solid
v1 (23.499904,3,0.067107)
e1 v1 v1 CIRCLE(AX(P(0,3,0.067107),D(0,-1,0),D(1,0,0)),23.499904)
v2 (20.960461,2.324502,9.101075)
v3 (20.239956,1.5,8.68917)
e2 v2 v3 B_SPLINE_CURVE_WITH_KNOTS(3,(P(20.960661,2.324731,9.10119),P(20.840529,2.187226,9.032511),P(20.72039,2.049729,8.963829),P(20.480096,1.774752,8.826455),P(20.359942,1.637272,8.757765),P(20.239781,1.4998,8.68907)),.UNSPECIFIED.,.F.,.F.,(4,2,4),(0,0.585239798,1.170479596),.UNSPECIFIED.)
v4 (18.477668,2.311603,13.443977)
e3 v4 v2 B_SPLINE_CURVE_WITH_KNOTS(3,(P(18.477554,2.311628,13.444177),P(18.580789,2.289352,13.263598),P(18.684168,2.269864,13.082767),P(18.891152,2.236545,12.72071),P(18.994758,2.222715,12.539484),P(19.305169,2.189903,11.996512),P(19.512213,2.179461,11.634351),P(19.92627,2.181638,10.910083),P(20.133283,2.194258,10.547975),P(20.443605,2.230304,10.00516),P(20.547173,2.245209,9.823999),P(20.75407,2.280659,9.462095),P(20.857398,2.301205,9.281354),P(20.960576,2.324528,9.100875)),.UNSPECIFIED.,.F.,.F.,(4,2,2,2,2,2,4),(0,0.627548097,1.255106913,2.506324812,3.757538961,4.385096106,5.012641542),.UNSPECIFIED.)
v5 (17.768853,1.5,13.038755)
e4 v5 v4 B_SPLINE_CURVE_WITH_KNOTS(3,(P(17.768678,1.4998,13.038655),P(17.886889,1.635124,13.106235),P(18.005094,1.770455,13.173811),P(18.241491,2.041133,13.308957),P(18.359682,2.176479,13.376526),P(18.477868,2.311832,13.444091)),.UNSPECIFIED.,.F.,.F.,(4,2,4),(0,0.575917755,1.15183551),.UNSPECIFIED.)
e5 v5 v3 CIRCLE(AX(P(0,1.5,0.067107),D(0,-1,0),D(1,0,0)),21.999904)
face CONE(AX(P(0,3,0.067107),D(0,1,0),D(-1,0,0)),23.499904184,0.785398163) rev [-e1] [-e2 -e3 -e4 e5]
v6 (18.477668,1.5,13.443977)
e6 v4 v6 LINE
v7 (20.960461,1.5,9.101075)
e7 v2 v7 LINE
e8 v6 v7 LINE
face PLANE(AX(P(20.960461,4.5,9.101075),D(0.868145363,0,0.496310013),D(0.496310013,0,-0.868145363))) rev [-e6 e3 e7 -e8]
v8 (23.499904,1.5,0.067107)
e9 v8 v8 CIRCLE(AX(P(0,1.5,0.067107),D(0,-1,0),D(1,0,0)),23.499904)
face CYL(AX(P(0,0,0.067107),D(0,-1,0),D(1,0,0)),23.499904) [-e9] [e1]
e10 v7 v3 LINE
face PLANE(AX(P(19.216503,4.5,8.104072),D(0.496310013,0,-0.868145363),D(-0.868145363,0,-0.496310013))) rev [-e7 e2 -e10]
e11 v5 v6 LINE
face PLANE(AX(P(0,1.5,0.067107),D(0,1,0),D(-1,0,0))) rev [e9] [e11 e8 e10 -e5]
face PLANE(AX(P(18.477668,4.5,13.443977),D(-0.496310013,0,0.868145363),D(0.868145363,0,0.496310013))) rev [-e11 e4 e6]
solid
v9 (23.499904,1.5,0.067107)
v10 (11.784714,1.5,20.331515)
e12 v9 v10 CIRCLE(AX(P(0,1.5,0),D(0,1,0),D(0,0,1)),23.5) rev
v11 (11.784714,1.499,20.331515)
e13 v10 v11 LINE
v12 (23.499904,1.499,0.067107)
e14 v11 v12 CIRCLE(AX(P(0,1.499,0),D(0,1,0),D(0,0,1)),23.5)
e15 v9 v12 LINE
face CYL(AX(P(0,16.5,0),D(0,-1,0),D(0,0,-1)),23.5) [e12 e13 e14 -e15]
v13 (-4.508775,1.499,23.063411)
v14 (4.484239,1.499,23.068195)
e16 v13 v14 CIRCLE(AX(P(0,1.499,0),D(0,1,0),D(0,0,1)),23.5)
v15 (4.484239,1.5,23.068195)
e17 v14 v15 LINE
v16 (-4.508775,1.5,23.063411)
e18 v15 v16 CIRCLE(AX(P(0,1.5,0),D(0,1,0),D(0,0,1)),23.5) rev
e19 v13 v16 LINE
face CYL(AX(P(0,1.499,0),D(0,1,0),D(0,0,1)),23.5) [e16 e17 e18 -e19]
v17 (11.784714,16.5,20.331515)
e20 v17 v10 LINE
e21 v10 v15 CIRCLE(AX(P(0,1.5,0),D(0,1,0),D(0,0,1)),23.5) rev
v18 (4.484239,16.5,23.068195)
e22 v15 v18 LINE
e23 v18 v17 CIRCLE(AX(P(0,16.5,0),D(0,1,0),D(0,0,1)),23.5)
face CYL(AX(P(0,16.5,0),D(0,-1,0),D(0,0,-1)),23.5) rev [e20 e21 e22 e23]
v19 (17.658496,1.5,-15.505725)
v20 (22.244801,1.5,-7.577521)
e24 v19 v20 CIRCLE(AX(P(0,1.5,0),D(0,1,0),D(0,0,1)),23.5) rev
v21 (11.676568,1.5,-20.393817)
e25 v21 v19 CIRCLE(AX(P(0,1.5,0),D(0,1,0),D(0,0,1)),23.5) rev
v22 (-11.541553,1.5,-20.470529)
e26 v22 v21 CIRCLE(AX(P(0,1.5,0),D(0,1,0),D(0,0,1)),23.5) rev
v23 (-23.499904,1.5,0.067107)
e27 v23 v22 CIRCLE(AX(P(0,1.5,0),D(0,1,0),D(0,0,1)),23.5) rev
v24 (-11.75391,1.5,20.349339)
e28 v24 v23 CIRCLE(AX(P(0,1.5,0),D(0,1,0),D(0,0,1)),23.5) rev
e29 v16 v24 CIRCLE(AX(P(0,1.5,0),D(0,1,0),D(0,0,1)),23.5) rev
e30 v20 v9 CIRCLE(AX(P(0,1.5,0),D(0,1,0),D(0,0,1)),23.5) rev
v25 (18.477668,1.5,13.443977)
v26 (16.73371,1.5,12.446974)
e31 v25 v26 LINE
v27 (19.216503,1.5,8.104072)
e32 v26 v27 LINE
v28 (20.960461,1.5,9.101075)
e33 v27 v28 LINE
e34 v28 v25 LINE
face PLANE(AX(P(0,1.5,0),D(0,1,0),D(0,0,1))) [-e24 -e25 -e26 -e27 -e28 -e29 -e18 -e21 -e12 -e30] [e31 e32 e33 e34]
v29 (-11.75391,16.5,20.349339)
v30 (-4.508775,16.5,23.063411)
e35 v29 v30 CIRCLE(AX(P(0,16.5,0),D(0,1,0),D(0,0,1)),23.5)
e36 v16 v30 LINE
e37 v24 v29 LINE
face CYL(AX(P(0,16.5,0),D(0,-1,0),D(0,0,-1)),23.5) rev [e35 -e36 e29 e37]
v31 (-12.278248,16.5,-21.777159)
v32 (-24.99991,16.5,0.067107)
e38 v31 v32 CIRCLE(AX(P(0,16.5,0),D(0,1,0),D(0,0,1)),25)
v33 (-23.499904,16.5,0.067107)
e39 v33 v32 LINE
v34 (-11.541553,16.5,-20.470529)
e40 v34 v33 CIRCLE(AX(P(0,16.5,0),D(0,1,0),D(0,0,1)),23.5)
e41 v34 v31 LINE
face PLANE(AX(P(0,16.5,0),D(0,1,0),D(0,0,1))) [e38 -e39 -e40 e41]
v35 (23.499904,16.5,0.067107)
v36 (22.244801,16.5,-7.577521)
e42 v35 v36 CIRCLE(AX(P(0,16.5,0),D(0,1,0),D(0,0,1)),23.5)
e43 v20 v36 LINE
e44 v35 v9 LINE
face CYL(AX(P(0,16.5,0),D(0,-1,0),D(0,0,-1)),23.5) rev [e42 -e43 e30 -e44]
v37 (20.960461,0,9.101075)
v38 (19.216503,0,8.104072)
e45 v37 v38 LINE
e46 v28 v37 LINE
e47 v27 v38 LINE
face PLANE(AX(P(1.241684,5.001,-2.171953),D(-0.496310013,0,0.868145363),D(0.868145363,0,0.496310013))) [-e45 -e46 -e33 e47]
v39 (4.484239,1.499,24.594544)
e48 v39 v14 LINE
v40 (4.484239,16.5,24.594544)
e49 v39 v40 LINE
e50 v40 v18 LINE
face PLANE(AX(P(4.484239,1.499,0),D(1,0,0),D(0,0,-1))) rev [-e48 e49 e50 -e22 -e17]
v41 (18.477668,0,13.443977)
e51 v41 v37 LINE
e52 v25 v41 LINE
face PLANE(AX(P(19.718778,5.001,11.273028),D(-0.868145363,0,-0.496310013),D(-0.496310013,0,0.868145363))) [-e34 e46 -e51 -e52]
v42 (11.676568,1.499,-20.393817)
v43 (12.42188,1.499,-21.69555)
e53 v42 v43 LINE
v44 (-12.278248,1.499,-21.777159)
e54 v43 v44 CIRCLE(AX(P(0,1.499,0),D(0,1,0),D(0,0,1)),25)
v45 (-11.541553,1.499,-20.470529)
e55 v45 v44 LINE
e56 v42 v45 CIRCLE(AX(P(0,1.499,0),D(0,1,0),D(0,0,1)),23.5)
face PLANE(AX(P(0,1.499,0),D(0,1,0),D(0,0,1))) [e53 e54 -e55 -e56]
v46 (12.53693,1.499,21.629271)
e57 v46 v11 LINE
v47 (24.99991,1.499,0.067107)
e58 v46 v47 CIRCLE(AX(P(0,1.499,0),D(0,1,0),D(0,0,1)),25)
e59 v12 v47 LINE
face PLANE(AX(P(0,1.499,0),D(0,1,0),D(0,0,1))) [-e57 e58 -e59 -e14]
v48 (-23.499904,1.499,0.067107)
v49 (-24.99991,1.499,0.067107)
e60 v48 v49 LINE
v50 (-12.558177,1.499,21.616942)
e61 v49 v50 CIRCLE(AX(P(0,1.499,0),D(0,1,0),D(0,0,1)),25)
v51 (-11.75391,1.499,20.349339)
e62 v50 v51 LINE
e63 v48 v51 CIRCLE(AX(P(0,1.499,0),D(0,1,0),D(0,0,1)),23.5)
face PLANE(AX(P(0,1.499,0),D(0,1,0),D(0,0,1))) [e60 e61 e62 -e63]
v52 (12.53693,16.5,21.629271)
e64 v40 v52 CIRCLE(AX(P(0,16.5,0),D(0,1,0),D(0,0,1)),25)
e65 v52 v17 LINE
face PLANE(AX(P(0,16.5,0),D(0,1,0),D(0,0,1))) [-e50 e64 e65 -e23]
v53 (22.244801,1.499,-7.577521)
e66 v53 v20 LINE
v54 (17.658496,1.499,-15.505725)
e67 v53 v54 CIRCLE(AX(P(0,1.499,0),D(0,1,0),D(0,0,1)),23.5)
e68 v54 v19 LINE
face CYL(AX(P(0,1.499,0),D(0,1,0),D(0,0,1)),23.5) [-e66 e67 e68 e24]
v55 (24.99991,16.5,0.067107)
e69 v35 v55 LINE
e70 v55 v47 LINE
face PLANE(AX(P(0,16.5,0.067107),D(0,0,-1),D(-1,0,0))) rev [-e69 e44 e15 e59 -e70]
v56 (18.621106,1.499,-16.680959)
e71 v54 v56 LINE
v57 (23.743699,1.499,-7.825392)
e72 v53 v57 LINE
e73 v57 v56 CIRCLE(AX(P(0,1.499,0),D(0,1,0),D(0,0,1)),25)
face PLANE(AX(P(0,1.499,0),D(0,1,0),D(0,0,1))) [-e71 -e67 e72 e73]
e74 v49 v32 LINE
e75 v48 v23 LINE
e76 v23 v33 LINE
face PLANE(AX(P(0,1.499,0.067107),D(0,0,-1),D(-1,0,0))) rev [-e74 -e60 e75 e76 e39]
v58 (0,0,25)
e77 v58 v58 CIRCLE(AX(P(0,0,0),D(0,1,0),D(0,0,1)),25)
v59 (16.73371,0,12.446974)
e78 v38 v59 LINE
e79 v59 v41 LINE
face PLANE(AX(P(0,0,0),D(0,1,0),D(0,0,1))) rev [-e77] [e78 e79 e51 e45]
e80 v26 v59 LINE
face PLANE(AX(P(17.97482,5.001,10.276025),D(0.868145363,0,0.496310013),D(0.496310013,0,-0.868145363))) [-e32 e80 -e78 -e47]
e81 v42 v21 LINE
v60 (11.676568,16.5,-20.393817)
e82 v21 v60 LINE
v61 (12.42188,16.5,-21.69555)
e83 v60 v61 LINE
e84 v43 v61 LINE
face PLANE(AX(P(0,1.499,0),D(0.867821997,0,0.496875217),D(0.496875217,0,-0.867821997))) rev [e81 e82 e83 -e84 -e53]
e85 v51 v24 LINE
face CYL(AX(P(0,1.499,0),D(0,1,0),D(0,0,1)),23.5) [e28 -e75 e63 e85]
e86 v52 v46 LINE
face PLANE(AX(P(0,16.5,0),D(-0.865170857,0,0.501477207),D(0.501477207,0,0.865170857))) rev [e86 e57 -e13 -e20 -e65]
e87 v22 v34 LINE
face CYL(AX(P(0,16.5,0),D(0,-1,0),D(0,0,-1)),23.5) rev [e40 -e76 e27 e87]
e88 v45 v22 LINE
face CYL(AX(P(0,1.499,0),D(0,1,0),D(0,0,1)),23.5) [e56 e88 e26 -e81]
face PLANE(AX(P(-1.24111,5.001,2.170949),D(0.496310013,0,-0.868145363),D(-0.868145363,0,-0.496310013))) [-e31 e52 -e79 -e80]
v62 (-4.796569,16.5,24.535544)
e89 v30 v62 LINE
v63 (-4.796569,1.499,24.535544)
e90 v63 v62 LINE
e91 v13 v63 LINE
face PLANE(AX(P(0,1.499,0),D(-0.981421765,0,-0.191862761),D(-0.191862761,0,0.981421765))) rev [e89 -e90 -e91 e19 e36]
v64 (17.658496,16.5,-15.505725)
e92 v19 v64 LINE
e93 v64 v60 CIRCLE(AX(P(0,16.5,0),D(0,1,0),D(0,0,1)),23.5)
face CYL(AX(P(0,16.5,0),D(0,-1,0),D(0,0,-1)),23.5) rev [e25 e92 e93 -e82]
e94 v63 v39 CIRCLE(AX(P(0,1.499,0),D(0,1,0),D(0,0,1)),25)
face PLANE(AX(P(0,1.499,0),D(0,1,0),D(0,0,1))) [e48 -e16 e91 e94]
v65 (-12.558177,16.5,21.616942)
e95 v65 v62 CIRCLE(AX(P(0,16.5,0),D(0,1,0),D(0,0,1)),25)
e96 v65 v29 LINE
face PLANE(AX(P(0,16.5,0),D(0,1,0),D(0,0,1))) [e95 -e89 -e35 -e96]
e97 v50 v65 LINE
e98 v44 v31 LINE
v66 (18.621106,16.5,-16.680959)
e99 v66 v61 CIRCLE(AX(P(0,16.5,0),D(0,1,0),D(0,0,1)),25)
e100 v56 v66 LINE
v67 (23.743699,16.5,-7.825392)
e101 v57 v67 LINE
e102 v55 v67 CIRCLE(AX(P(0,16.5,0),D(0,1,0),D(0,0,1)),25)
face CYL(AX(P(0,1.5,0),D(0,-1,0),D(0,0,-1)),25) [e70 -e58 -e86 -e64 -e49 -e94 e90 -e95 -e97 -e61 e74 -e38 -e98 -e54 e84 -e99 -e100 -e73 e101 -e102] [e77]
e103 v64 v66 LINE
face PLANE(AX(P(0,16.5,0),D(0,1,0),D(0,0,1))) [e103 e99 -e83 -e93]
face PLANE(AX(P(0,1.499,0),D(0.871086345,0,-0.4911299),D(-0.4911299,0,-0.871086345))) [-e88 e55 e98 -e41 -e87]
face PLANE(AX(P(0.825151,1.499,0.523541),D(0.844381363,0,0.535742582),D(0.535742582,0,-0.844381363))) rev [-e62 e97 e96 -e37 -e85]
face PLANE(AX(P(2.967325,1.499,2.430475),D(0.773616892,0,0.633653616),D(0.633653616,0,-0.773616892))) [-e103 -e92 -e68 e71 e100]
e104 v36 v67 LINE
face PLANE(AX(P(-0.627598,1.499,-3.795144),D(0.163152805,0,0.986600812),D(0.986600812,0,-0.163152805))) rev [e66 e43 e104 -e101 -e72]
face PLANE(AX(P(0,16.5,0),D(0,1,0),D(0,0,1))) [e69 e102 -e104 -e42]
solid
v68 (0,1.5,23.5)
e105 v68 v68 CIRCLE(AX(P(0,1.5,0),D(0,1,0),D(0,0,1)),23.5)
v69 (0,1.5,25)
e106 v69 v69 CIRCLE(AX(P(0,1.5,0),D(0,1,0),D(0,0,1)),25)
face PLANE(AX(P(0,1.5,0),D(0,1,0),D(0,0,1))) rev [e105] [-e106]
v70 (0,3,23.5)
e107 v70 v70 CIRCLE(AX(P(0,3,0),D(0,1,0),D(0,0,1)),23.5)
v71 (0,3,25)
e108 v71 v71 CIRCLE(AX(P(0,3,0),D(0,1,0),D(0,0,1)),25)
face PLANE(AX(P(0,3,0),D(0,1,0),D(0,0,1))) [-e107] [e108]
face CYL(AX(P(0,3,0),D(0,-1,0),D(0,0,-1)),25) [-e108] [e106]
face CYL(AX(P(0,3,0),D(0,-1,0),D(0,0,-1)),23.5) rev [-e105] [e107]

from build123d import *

# Parameters (mm, degrees)
SKETCH1_R               = 25
BOSS_EXTRUDE1_DEPTH     = 1.5
BOSS_EXTRUDE2_DEPTH     = 15
CUT_EXTRUDE3_DEPTH      = 15
CUT_EXTRUDE3_DEPTH_BACK = 0.001
CUT_EXTRUDE4_DEPTH      = 5.001
SKETCH9_R               = 25
SKETCH9_R_2             = 23.5
BOSS_EXTRUDE4_DEPTH     = 1.5
CUT_EXTRUDE5_DEPTH      = 4.5


with BuildPart() as part:
    # Sketch1 → Boss-Extrude1 (new body)
    with BuildSketch(Plane(origin=(0, 0, 0), x_dir=(1, 0, 0), z_dir=(0, 1, 0))):
        Circle(SKETCH1_R)
    extrude(amount=BOSS_EXTRUDE1_DEPTH)

    # Sketch3 → Boss-Extrude2 (add)
    with BuildSketch(Plane(origin=(0, 1.5, 0), x_dir=(1, 0, 0), z_dir=(0, 1, 0))):
        with BuildLine():
            ThreePointArc((25, 0), (-10.270047641, 22.793115659), (-16.562089716, -18.726910696))
            ThreePointArc((-16.562089716, -18.726910696), (10.270047641, -22.793115659), (25, 0))
        make_face()
        with BuildLine():
            ThreePointArc((23.5, 0), (9.653844782, -21.42552872), (-15.568364333, -17.603296054))
            ThreePointArc((-15.568364333, -17.603296054), (-9.653844782, 21.42552872), (23.5, 0))
        make_face(mode=Mode.SUBTRACT)
    extrude(amount=BOSS_EXTRUDE2_DEPTH)

    # Sketch4 → Cut-Extrude3 (cut, two sides: drawn at the far end of the back side and taken through both)
    with BuildSketch(Plane(origin=(0, 1.5, 0), x_dir=(1, 0, 0), z_dir=(0, 1, 0)).offset(-CUT_EXTRUDE3_DEPTH_BACK)):
        with BuildLine():
            Line((11.784714356, -20.331515132), (12.536930166, -21.629271417))
            ThreePointArc((12.536930166, -21.629271417), (21.64452184, -12.510582494), (24.999909933, -0.067106913))
            Line((24.999909933, -0.067106913), (23.499904184, -0.067106913))
            ThreePointArc((23.499904184, -0.067106913), (20.344842995, -11.761690504), (11.784714356, -20.331515132))
        make_face()
        with BuildLine():
            ThreePointArc((-4.796569027, -24.535544126), (-0.158926829, -24.99949484), (4.48423915, -24.594544095))
            Line((4.48423915, -24.594544095), (4.48423915, -23.068194538))
            ThreePointArc((4.48423915, -23.068194538), (-0.0124988, -23.499996676), (-4.508774886, -23.063411479))
            Line((-4.508774886, -23.063411479), (-4.796569027, -24.535544126))
        make_face()
        with BuildLine():
            ThreePointArc((-24.999909933, -0.067106913), (-21.650665798, -12.49994682), (-12.558177453, -21.616941945))
            Line((-12.558177453, -21.616941945), (-11.753909653, -20.349339249))
            ThreePointArc((-11.753909653, -20.349339249), (-20.335930877, -11.777092823), (-23.499904184, -0.067106913))
            Line((-23.499904184, -0.067106913), (-24.999909933, -0.067106913))
        make_face()
        with BuildLine():
            Line((22.244801118, 7.577520917), (23.743699089, 7.825391591))
            ThreePointArc((23.743699089, 7.825391591), (21.640227627, 12.518008956), (18.621106201, 16.680959321))
            Line((18.621106201, 16.680959321), (17.658496176, 15.505725162))
            ThreePointArc((17.658496176, 15.505725162), (20.341641757, 11.767226123), (22.244801118, 7.577520917))
        make_face()
        with BuildLine():
            ThreePointArc((12.42188042, 21.695549931), (0.082599021, 24.999863548), (-12.27824751, 21.777158632))
            Line((-12.27824751, 21.777158632), (-11.541552659, 20.470529114))
            ThreePointArc((-11.541552659, 20.470529114), (0.07764308, 23.499871735), (11.676567595, 20.393816936))
            Line((11.676567595, 20.393816936), (12.42188042, 21.695549931))
        make_face()
    extrude(amount=CUT_EXTRUDE3_DEPTH + CUT_EXTRUDE3_DEPTH_BACK, mode=Mode.SUBTRACT)

    # Sketch5 → Cut-Extrude4 (cut)
    with BuildSketch(Plane.XZ):
        Polygon((16.733709956, 12.446973803), (19.216503445, 8.104071987), (20.960461392, 9.101075286), (18.477667903, 13.443977102), align=None)
    extrude(amount=-CUT_EXTRUDE4_DEPTH, mode=Mode.SUBTRACT)


with BuildPart() as body_2:
    # Sketch8 → Revolve4 (revolve)
    with BuildSketch(Plane.XY.offset(0.067106913)):
        Polygon((-23.499904184, 3), (-23.499904184, 1.5), (-21.999904184, 1.5), align=None)
    revolve(axis=Axis((0, 0, 0.067106913), (0, 1, 0)))

    # Sketch10 → Cut-Extrude5 (cut)
    with BuildSketch(Plane.XZ):
        Polygon((19.216503445, 8.104071987), (20.960461392, 9.101075286), (18.477667903, 13.443977102), (16.733709956, 12.446973803), align=None)
    extrude(amount=-CUT_EXTRUDE5_DEPTH, mode=Mode.SUBTRACT)


with BuildPart() as body_3:
    # Sketch9 → Boss-Extrude4 (new body)
    with BuildSketch(Plane(origin=(0, 1.5, 0), x_dir=(1, 0, 0), z_dir=(0, 1, 0))):
        Circle(SKETCH9_R)
        Circle(SKETCH9_R_2, mode=Mode.SUBTRACT)
    extrude(amount=BOSS_EXTRUDE4_DEPTH)


solid = Compound([part.part, body_2.part, body_3.part])
